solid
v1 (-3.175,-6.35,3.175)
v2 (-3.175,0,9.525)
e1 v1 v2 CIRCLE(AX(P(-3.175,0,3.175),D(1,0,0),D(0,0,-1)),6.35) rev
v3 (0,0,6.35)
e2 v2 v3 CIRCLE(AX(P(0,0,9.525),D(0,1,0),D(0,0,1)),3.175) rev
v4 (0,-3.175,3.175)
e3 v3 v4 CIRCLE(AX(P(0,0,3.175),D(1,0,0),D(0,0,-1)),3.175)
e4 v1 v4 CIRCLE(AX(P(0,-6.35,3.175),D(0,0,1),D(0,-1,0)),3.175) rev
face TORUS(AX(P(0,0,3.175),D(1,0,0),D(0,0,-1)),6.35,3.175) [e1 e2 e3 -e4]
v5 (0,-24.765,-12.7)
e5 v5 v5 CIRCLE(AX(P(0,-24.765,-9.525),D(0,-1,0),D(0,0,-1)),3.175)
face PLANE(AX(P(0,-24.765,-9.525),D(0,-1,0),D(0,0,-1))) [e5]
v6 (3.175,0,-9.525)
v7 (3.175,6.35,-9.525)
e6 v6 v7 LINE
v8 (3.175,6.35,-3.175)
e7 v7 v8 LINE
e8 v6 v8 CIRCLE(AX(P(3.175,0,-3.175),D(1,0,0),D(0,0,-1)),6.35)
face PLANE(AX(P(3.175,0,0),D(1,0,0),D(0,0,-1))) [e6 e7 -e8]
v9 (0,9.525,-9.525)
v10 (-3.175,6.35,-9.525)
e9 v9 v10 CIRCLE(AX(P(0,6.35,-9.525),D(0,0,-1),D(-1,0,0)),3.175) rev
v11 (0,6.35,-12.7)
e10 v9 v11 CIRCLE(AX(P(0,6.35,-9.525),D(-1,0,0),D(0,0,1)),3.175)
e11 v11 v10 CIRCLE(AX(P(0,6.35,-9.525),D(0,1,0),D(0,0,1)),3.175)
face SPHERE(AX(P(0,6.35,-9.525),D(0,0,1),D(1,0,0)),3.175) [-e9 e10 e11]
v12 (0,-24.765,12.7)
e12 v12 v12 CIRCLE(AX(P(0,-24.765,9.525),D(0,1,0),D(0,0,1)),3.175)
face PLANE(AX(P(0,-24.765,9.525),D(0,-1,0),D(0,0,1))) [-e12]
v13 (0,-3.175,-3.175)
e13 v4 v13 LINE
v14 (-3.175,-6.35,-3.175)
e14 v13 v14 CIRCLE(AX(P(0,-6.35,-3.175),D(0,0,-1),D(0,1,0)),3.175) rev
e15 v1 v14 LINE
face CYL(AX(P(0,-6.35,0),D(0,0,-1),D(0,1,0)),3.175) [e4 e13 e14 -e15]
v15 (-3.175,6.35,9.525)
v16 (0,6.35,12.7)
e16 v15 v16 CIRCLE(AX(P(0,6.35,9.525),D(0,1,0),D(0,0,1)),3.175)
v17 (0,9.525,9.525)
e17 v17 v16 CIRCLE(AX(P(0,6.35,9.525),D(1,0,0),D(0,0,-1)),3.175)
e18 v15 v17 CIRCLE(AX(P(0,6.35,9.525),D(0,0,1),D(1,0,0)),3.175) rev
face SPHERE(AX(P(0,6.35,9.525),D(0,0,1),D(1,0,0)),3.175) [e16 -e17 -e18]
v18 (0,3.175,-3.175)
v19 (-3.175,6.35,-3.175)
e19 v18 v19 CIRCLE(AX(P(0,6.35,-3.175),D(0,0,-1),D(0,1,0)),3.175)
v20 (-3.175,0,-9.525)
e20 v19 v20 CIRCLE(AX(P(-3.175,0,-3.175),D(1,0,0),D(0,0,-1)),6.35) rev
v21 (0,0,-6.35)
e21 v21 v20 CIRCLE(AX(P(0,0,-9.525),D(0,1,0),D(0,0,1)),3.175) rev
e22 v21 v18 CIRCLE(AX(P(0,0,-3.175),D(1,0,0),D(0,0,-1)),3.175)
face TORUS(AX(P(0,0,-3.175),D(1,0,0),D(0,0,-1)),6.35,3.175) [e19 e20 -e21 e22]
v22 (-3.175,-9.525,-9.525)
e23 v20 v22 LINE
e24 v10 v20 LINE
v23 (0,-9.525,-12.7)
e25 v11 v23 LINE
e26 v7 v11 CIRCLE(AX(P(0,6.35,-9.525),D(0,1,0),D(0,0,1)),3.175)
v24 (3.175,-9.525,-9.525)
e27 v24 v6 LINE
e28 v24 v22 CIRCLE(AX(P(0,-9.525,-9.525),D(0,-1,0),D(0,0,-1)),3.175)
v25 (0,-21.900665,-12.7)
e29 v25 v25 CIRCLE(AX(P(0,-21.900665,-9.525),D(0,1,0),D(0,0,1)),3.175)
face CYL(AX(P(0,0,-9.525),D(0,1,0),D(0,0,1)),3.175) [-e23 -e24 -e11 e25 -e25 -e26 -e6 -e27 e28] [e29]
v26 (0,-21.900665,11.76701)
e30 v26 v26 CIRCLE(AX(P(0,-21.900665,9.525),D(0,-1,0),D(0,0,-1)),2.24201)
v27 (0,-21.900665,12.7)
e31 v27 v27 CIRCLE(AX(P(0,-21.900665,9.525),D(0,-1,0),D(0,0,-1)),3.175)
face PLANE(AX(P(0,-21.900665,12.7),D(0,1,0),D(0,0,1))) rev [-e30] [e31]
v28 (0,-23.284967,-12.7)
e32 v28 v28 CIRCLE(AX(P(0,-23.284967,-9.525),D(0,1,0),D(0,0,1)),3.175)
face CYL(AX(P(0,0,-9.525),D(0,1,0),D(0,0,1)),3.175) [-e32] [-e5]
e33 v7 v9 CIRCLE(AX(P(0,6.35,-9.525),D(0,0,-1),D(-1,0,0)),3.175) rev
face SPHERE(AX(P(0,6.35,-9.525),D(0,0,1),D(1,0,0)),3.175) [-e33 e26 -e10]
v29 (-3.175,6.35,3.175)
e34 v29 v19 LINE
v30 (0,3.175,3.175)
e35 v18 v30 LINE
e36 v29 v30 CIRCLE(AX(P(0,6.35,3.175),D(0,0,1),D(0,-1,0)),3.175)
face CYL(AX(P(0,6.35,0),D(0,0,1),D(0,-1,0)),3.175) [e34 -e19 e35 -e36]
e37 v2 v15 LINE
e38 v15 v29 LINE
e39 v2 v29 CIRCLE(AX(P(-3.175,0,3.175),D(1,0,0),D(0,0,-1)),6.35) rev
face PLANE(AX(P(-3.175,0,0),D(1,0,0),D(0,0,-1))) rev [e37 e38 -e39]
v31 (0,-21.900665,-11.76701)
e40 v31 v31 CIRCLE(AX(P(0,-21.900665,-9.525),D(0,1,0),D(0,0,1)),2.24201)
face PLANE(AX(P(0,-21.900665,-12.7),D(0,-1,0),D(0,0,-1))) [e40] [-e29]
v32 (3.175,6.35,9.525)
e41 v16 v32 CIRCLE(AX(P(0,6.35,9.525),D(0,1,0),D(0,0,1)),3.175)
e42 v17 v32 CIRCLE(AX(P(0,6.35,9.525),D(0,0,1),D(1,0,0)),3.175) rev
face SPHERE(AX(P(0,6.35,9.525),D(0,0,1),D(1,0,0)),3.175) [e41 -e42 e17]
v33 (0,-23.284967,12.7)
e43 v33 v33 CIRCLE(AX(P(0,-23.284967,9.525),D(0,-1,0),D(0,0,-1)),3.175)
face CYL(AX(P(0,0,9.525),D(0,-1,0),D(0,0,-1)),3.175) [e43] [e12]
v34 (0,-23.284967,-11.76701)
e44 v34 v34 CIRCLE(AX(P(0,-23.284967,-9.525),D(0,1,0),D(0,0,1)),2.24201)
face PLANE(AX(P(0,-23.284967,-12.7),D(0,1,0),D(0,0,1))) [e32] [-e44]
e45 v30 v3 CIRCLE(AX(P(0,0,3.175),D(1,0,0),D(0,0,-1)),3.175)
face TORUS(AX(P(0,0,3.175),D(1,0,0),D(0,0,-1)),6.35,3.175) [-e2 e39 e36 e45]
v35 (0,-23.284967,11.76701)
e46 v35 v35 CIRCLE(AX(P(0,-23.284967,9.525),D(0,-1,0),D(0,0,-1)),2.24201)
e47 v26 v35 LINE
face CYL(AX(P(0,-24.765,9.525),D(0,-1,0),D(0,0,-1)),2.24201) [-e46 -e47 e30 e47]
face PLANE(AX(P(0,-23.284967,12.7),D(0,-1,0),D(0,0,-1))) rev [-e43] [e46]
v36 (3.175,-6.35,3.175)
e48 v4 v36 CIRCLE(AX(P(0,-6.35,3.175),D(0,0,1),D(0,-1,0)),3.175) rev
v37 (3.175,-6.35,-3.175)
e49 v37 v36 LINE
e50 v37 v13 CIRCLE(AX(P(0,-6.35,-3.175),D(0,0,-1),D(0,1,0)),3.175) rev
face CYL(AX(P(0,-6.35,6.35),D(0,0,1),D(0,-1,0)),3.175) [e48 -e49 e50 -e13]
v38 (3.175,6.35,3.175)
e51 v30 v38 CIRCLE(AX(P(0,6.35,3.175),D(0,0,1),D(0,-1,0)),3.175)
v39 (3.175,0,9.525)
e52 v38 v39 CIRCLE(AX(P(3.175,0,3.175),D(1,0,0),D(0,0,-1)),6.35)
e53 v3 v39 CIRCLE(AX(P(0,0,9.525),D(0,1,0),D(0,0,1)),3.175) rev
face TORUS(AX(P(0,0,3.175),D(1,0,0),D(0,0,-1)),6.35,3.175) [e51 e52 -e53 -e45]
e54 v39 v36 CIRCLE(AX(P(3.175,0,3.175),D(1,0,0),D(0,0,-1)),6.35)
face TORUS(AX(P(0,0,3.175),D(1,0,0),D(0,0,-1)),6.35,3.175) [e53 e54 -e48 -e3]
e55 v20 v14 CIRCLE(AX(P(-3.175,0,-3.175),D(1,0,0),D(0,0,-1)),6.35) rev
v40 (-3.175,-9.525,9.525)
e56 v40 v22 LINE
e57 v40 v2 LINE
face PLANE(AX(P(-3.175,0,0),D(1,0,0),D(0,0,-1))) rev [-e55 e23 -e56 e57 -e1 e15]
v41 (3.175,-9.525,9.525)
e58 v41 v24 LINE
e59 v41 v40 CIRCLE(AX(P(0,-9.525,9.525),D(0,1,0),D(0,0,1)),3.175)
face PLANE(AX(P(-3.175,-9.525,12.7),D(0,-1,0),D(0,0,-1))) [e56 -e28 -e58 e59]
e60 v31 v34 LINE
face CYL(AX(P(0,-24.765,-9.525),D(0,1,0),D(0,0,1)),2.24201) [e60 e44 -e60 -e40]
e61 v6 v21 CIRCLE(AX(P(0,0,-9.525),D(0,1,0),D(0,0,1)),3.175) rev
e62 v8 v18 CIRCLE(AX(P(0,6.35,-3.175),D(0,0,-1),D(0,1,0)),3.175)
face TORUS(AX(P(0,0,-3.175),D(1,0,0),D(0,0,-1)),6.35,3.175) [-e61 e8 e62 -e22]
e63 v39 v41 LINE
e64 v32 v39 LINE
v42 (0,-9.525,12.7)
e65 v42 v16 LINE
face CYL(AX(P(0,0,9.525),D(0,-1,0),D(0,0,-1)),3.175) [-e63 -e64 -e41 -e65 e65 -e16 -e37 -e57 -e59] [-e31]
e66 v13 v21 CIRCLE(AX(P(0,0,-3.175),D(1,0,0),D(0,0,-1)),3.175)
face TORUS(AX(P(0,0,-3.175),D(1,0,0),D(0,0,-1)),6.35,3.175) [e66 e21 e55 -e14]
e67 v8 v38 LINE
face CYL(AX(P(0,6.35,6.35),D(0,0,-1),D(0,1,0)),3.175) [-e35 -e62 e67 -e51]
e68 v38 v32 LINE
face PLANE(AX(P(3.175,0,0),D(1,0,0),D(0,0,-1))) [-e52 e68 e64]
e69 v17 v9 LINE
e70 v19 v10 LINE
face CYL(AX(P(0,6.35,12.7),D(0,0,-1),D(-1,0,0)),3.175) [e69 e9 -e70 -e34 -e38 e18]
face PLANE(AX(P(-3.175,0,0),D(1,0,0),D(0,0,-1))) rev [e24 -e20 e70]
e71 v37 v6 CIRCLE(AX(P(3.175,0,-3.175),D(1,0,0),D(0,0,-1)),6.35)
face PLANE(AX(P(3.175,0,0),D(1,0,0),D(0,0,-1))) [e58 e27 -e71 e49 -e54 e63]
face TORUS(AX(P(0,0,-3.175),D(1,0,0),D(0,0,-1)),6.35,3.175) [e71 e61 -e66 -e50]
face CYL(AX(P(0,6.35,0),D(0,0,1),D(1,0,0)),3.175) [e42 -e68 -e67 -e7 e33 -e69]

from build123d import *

# Parameters (mm, degrees)
BOSS_EXTRUDE1_DEPTH      = 3.175
BOSS_EXTRUDE1_DEPTH_BACK = 3.175
SKETCH1_W                = 25.4
SKETCH1_H                = 19.05
SKETCH1_W_2              = 12.7
SKETCH1_H_2              = 6.35
FILLET1_R                = 3.175
SKETCH3_R                = 3.175
BOSS_EXTRUDE2_DEPTH      = 15.24
SKETCH6_W                = 0.932989676
SKETCH6_H                = 1.384301363


with BuildPart() as part:
    # Sketch1 → Boss-Extrude1 (new, two sides: drawn at the far end of the back side and taken through both)
    with BuildSketch(Plane(origin=(0, 0, 0), x_dir=(0, 0, -1), z_dir=(1, 0, 0)).offset(-BOSS_EXTRUDE1_DEPTH_BACK)):
        Rectangle(SKETCH1_W, SKETCH1_H)
        Rectangle(SKETCH1_W_2, SKETCH1_H_2, mode=Mode.SUBTRACT)
    extrude(amount=BOSS_EXTRUDE1_DEPTH + BOSS_EXTRUDE1_DEPTH_BACK)

    # Fillet1
    fillet1_edges = [part.edges().sort_by_distance(p)[0] for p in [
        (-3.175, 0, -12.7),
        (-3.175, 9.525, 0),
        (-3.175, 0, 6.35),
        (0, -3.175, 6.35),
        (-3.175, 3.175, 0),
        (0, 3.175, 6.35),
        (-3.175, 0, -6.35),
        (0, 3.175, -6.35),
        (-3.175, -3.175, 0),
        (0, -3.175, -6.35),
        (3.175, 0, 12.7),
        (3.175, 0, -12.7),
        (3.175, 9.525, 0),
        (3.175, 0, 6.35),
        (3.175, -3.175, 0),
        (3.175, 0, -6.35),
        (3.175, 3.175, 0),
        (-3.175, 0, 12.7),
        (0, 9.525, 12.7),
        (0, 9.525, -12.7),
    ]]
    fillet(fillet1_edges, radius=FILLET1_R - 0.0001)  # a hair under: the kernel refuses the full size

    # Sketch3 → Boss-Extrude2 (add)
    with BuildSketch(Plane.XZ.offset(9.525)):
        with Locations(Location((0, -9.525, 0), (0, 0, 270))):
            Circle(SKETCH3_R)
    boss_extrude2 = extrude(amount=BOSS_EXTRUDE2_DEPTH)

    # Cut-Sweep1: sweep along a curve in space
    with BuildLine() as cut_sweep1_path:
        ThreePointArc((0, -24.765, -12.7), (2.24506403, -24.765, -11.77006403), (3.175, -24.765, -9.525))
        ThreePointArc((3.175, -24.765, -9.525), (2.24506403, -24.765, -7.27993597), (0, -24.765, -6.35))
        ThreePointArc((0, -24.765, -6.35), (-2.24506403, -24.765, -7.27993597), (-3.175, -24.765, -9.525))
        ThreePointArc((-3.175, -24.765, -9.525), (-2.24506403, -24.765, -11.77006403), (0, -24.765, -12.7))
    # Sketch6 → Cut-Sweep1 (sweep, cut)
    with BuildSketch(Plane(origin=(0, 0, 0), x_dir=(0, 0, -1), z_dir=(1, 0, 0))):
        with Locations((12.233505162, -22.592816152)):
            Rectangle(SKETCH6_W, SKETCH6_H)
    cut_sweep1 = sweep(path=cut_sweep1_path.line, mode=Mode.SUBTRACT)

    # Mirror1: Boss-Extrude2, Cut-Sweep1 across plane
    add(boss_extrude2.mirror(Plane.XY))
    add(cut_sweep1.mirror(Plane.XY), mode=Mode.SUBTRACT)


solid = part.part
